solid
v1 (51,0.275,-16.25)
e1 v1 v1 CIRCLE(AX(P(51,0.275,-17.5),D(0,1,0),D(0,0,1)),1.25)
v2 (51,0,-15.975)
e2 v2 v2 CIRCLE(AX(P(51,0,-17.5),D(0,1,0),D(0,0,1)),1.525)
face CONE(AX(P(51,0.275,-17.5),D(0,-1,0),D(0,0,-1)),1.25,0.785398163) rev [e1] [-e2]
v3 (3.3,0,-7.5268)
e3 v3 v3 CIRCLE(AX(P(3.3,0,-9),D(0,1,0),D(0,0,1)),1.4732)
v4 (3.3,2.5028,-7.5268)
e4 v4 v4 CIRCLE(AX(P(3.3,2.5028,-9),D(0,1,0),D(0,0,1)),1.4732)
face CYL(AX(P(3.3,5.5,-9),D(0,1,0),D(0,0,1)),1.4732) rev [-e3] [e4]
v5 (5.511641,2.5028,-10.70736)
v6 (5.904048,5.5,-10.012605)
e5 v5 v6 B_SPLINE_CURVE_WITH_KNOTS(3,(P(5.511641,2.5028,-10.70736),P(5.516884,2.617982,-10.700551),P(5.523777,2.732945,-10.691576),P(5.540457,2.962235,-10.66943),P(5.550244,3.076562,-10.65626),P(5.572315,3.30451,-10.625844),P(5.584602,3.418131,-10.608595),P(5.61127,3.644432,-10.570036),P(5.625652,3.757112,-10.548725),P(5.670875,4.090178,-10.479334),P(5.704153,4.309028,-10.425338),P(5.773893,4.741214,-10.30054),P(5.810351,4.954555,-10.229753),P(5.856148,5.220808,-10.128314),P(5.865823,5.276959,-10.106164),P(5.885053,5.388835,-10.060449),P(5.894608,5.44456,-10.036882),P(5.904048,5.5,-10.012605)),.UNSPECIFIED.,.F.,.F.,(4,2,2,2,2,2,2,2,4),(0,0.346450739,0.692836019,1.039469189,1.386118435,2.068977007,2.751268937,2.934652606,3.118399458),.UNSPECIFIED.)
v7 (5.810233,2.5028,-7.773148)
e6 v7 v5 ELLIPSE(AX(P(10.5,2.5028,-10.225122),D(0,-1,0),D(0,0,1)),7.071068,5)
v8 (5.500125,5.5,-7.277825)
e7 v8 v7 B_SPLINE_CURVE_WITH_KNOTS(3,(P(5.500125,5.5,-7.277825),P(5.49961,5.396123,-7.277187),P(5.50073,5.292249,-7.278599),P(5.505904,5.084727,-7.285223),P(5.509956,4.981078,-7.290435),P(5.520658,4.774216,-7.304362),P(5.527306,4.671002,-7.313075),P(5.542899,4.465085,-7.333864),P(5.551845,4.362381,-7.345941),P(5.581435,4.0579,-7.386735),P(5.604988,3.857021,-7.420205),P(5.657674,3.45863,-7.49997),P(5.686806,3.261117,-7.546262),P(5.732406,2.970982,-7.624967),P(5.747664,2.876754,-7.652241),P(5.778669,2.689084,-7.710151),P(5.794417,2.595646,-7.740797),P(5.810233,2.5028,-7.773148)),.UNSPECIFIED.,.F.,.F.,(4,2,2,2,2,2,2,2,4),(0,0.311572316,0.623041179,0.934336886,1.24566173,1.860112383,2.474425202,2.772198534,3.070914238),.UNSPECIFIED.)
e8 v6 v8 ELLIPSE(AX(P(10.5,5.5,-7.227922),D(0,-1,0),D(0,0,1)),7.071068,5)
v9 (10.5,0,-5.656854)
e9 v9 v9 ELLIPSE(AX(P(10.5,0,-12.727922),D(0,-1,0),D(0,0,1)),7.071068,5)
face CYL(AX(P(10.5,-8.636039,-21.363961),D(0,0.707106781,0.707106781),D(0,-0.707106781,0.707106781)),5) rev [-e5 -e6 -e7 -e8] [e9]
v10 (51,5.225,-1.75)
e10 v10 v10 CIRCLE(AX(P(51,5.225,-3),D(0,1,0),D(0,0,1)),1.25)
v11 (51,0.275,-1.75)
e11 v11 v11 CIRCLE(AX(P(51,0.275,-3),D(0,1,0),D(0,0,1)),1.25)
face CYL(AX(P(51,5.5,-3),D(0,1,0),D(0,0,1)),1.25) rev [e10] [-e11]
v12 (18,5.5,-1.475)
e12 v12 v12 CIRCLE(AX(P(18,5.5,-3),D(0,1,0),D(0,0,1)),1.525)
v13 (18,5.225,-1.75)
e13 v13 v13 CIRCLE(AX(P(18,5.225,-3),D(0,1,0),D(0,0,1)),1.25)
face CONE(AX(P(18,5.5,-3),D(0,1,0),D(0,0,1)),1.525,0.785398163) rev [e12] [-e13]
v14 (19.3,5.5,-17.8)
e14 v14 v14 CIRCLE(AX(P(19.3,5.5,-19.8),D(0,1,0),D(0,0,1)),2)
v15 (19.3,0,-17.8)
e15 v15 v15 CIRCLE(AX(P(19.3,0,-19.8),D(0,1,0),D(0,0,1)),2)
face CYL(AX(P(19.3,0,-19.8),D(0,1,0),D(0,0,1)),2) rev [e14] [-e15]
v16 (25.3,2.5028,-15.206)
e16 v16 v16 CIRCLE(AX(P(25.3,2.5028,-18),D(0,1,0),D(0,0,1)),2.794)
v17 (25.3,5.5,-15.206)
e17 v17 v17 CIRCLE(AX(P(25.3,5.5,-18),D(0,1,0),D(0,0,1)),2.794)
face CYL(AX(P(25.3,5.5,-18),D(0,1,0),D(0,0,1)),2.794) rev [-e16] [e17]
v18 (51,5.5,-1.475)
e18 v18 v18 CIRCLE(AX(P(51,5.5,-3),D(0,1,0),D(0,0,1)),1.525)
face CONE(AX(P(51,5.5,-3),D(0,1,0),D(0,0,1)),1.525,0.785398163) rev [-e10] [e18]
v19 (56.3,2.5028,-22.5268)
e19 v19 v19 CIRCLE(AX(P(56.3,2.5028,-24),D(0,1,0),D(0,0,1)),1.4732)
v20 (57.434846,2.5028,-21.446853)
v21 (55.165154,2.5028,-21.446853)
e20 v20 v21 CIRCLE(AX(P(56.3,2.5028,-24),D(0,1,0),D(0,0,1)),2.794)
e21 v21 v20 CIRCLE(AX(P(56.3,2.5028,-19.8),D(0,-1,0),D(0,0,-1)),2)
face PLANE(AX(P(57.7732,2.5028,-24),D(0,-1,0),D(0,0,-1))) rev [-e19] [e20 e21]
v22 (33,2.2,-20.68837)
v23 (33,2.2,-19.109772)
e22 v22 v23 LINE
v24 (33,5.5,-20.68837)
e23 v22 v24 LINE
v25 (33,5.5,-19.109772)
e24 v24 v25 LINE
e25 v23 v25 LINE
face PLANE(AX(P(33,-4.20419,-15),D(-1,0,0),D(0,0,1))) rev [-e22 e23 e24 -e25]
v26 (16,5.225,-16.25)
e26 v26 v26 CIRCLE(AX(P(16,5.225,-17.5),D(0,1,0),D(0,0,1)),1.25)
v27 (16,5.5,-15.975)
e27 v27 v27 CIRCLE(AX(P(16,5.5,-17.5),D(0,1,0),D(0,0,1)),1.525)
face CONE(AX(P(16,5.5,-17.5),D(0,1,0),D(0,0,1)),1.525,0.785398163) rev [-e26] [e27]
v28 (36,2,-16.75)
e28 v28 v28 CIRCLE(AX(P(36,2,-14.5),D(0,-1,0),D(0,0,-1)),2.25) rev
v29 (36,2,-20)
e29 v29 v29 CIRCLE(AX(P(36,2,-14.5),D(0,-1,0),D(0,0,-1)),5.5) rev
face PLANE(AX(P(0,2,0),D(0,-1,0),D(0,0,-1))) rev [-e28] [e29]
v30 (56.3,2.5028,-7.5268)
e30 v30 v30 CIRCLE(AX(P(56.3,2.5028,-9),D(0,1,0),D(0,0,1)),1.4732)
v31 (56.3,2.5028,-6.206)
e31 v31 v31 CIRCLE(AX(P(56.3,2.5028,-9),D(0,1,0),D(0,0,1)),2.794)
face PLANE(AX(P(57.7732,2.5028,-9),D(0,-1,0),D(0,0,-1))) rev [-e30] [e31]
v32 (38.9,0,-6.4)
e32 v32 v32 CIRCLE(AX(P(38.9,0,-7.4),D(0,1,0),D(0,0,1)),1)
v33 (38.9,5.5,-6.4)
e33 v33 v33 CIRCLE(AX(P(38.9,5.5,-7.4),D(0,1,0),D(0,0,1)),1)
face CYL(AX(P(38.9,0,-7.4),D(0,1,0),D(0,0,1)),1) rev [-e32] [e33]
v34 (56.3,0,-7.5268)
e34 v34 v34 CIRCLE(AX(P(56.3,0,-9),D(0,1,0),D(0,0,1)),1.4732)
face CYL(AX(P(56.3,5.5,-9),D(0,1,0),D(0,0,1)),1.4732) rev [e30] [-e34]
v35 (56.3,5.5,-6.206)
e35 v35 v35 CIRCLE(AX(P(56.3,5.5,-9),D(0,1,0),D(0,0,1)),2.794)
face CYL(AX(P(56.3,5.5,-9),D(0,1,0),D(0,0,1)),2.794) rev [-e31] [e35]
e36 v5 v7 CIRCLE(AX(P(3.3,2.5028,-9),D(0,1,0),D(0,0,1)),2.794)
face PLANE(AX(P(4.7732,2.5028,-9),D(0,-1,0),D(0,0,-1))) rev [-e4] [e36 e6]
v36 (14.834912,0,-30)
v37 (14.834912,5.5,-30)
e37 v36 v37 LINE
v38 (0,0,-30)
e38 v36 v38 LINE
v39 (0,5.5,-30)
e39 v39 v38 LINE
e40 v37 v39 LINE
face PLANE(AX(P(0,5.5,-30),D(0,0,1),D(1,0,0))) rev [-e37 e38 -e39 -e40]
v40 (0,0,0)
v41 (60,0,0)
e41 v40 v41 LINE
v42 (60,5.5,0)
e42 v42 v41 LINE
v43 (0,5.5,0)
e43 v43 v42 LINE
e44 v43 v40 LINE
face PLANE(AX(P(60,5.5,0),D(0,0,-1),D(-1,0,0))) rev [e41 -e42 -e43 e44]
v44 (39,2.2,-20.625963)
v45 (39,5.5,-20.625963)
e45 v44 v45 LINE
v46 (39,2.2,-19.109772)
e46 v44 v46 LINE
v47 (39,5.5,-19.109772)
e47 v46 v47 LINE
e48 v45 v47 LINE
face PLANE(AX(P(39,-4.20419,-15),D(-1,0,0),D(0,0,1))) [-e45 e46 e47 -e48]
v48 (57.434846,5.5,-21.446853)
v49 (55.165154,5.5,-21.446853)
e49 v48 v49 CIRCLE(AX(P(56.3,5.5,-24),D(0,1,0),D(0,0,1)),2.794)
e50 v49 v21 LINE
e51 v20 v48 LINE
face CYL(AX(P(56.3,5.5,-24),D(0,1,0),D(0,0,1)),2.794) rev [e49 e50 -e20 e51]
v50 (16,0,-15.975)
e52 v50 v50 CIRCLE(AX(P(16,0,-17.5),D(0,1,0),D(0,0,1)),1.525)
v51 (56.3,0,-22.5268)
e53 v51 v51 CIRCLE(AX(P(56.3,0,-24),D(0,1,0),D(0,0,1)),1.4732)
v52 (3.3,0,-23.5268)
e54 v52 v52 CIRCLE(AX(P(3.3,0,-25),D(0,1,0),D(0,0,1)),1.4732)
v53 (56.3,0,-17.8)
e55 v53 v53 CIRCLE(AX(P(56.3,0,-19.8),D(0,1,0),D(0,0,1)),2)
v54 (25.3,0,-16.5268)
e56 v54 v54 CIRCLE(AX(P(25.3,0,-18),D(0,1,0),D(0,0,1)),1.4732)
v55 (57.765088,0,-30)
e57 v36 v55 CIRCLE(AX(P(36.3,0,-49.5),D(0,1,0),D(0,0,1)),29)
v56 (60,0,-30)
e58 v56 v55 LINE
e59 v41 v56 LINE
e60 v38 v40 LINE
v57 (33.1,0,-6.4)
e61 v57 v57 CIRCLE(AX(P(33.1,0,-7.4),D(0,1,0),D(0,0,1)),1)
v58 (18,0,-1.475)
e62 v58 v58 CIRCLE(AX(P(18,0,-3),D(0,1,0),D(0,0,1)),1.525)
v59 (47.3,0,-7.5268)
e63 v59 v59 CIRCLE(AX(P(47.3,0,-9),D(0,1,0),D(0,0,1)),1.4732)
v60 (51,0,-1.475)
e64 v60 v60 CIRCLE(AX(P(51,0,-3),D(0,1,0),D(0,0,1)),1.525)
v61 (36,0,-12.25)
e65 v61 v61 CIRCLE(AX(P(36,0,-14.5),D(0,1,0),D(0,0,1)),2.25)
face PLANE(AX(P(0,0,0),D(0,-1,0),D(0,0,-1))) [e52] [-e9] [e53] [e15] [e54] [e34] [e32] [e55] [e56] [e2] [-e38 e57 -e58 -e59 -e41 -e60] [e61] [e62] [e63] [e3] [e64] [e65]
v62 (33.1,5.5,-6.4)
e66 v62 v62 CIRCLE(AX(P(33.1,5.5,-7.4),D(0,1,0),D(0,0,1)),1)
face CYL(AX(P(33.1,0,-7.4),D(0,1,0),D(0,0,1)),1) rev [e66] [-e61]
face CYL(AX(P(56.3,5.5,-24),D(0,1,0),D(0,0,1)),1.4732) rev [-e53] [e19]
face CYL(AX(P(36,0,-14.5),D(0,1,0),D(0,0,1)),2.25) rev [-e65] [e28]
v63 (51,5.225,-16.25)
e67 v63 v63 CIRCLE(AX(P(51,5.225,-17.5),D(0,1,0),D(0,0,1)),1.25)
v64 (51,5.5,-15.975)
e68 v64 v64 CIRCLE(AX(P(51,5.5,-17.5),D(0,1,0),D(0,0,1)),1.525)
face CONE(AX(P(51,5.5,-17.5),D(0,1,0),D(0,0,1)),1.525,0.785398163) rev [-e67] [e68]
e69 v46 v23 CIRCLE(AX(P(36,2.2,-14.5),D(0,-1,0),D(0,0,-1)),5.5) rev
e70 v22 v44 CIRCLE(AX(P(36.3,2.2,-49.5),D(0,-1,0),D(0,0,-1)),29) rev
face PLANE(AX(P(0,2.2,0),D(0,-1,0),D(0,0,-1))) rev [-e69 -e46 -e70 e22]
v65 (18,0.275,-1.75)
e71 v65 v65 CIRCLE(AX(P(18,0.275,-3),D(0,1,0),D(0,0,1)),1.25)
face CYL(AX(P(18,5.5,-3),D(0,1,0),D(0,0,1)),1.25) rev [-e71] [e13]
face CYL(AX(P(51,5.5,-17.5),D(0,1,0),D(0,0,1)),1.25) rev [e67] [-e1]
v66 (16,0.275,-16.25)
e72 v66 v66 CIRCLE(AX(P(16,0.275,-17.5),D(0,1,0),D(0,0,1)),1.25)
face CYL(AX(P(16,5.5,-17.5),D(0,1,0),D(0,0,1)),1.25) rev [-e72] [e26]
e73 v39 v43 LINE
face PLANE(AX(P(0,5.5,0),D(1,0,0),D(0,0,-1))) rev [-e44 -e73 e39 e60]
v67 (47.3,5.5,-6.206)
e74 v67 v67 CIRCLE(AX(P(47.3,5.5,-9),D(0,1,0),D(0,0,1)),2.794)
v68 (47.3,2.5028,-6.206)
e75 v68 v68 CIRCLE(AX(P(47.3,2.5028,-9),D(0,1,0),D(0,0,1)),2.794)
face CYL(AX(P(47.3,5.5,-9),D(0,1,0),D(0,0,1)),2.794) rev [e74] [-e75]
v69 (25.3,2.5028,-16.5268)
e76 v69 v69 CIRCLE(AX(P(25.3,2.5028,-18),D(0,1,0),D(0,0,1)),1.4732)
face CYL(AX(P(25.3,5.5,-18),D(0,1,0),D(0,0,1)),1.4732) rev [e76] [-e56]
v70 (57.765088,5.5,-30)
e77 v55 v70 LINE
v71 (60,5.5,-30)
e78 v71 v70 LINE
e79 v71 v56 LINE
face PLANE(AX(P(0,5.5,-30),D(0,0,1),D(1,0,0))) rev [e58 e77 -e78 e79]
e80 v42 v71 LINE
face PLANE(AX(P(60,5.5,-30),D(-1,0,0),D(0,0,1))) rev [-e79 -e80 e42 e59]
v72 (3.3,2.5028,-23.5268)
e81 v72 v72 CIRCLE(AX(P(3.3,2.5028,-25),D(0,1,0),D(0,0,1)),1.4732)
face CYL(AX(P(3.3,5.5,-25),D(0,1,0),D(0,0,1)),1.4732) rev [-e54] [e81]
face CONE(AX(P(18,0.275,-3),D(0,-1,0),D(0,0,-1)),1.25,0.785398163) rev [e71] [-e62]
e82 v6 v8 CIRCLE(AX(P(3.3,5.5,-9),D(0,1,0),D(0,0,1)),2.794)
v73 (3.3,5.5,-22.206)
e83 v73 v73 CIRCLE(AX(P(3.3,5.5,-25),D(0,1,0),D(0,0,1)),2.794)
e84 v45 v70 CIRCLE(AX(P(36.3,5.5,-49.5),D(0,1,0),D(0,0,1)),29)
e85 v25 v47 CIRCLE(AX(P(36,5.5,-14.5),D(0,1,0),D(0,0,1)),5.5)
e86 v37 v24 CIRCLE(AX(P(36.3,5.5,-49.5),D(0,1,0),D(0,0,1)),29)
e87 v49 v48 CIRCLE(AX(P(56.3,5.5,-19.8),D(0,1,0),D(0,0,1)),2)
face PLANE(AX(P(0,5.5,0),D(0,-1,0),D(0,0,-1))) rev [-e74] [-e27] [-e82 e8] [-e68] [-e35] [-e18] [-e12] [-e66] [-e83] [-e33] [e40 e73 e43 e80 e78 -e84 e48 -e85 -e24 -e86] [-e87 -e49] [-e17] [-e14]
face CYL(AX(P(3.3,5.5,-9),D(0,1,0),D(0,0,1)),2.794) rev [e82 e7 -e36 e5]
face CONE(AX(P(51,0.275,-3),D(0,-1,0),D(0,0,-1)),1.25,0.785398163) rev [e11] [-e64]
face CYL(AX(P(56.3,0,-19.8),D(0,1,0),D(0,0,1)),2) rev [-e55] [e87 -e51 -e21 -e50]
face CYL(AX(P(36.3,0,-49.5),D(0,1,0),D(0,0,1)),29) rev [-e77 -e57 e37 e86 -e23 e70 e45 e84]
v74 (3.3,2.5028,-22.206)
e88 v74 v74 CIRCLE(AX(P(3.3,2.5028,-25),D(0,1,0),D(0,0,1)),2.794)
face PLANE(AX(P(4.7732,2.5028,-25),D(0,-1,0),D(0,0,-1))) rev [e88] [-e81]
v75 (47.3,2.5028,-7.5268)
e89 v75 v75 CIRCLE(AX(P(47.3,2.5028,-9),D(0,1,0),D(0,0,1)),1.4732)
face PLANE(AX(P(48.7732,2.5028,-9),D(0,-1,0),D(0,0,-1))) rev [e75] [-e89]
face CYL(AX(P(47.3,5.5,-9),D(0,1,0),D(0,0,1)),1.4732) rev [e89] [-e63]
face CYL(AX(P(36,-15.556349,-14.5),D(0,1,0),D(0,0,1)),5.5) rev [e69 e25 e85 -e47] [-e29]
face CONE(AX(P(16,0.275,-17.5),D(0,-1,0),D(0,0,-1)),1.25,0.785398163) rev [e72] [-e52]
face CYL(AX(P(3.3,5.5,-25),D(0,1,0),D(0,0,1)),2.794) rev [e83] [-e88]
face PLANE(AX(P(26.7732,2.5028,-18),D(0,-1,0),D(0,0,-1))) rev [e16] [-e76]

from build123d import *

# Parameters (mm, degrees)
SKETCH_1_W                 = 60
SKETCH_1_H                 = 30
EXTRUDE_1_DEPTH            = 5.5
HOLE_WIZARD_41_D           = 2.9464
HOLE_WIZARD_41_CBORE_D     = 5.588
HOLE_WIZARD_41_CBORE_DEPTH = 2.9972
CUT_EXTRUDE_START          = -5.5
CUT_EXTRUDE_1_OUTLINE_R    = 2.25
CUT_EXTRUDE_1_OUTLINE_R_2  = 2
CUT_EXTRUDE_1_OUTLINE_R_3  = 1
CUT_EXTRUDE_1_DEPTH        = 5.5
CUT_EXTRUDE_START_2        = -3.5
SKETCH_4_3_R               = 5.5
SKETCH_4_3_R_2             = 2.25
CUT_EXTRUDE_2_DEPTH        = 3.5
CUT_EXTRUDE_START_3        = -3.3
CUT_EXTRUDE_3_DEPTH        = 3.3
HOLE_WIZARD_M3_AT_2_COUNT  = 2
HOLE_WIZARD_M3_AT_2_PITCH  = 14.637281168
HOLE_WIZARD_M3_AT_3_COUNT  = 2
HOLE_WIZARD_M3_AT_3_PITCH  = 36.045110625
HOLE_WIZARD_M3_AT_4_COUNT  = 2
HOLE_WIZARD_M3_AT_4_PITCH  = 33
SKETCH_7_R                 = 5
CUT_EXTRUDE_4_DEPTH        = 69.411439102


# Read off the part's stored shape, not the designer's step: the extrude step
with BuildPart() as part:
    # Sketch 1 → Extrude 1 (new body)
    with BuildSketch(Plane(origin=(0, 0, 0), x_dir=(1, 0, 0), z_dir=(0, 1, 0))):
        with Locations((30, 15)):
            Rectangle(SKETCH_1_W, SKETCH_1_H)
    extrude(amount=EXTRUDE_1_DEPTH)

    # Hole Wizard 41 (through all)
    with Locations(Plane(origin=(0, 5.5, 0), x_dir=(-1, 0, 0), z_dir=(0, 1, 0))):
        with Locations((-47.3, -9), (-3.3, -9), (-25.3, -18), (-3.3, -25), (-56.3, -9), (-56.3, -24)):
            CounterBoreHole(HOLE_WIZARD_41_D / 2, HOLE_WIZARD_41_CBORE_D / 2, HOLE_WIZARD_41_CBORE_DEPTH)

    # Cut-Extrude 1 outline → Cut-Extrude 1 (cut)
    with BuildSketch(Plane(origin=(0, 5.5, 0), x_dir=(1, 0, 0), z_dir=(0, 1, 0)).offset(CUT_EXTRUDE_START)):
        with BuildLine():
            Line((57.765087934, 30), (14.834912066, 30))
            ThreePointArc((14.834912066, 30), (36.3, 20.5), (57.765087934, 30))
        make_face()
        with Locations((36, 14.5)):
            Circle(CUT_EXTRUDE_1_OUTLINE_R)
        with Locations((19.3, 19.8)):
            Circle(CUT_EXTRUDE_1_OUTLINE_R_2)
        with Locations((33.1, 7.4)):
            Circle(CUT_EXTRUDE_1_OUTLINE_R_3)
        with Locations((38.9, 7.4)):
            Circle(CUT_EXTRUDE_1_OUTLINE_R_3)
        with Locations((56.3, 19.8)):
            Circle(CUT_EXTRUDE_1_OUTLINE_R_2)
    extrude(amount=CUT_EXTRUDE_1_DEPTH, mode=Mode.SUBTRACT)

    # Sketch 4_3 → Cut-Extrude 2 (cut)
    with BuildSketch(Plane(origin=(0, 5.5, 0), x_dir=(1, 0, 0), z_dir=(0, 1, 0)).offset(CUT_EXTRUDE_START_2)):
        with Locations(Location((36, 14.5, 0), (0, 0, 270))):
            Circle(SKETCH_4_3_R)
        with Locations(Location((36, 14.5, 0), (0, 0, 270))):
            Circle(SKETCH_4_3_R_2, mode=Mode.SUBTRACT)
    extrude(amount=CUT_EXTRUDE_2_DEPTH, mode=Mode.SUBTRACT)

    # Sketch 4_4 → Cut-Extrude 3 (cut)
    with BuildSketch(Plane(origin=(0, 5.5, 0), x_dir=(1, 0, 0), z_dir=(0, 1, 0)).offset(CUT_EXTRUDE_START_3)):
        with BuildLine():
            Line((39, 19.109772229), (39, 20.62596322))
            ThreePointArc((39, 20.62596322), (35.998381592, 20.501568554), (33, 20.688370404))
            Line((33, 20.688370404), (33, 19.109772229))
            ThreePointArc((33, 19.109772229), (36, 20), (39, 19.109772229))
        make_face()
    extrude(amount=CUT_EXTRUDE_3_DEPTH, mode=Mode.SUBTRACT)

    # Sketch 5 → Hole Wizard M3 (revolve, cut)
    with BuildSketch(Plane(origin=(18, 5.5, -3), x_dir=(0, 0, 1), z_dir=(1, 0, 0))):
        Polygon((0, 0), (0, 5.5), (1.525, 5.5), (1.25, 5.225), (1.25, 0.275), (1.525, 0), align=None)
    hole_wizard_m3 = revolve(axis=Axis((18, 11.85, -3), (0, -1, 0)), mode=Mode.SUBTRACT)

    # Hole Wizard M3 at 2: Hole Wizard M3 ×2
    with Locations(*[Vector(-0.1366373971370308, 0, -0.9906211292434749) * (i * HOLE_WIZARD_M3_AT_2_PITCH) for i in range(1, HOLE_WIZARD_M3_AT_2_COUNT)]):
        add(hole_wizard_m3, mode=Mode.SUBTRACT)

    # Hole Wizard M3 at 3: Hole Wizard M3 ×2
    with Locations(*[Vector(0.9155194540230326, 0, -0.40227369949496883) * (i * HOLE_WIZARD_M3_AT_3_PITCH) for i in range(1, HOLE_WIZARD_M3_AT_3_COUNT)]):
        add(hole_wizard_m3, mode=Mode.SUBTRACT)

    # Hole Wizard M3 at 4: Hole Wizard M3 ×2
    with Locations(*[(i * HOLE_WIZARD_M3_AT_4_PITCH, 0, 0) for i in range(1, HOLE_WIZARD_M3_AT_4_COUNT)]):
        add(hole_wizard_m3, mode=Mode.SUBTRACT)

    # Sketch 7 → Cut-Extrude 4 (cut, through all)
    with BuildSketch(Plane(origin=(0, 2.75, 2.75), x_dir=(-1, 0, 0), z_dir=(0, 0.7071067811865462, 0.7071067811865488))):
        with Locations(Location((-10.5, -9, 0), (0, 0, 90))):
            Circle(SKETCH_7_R)
    extrude(amount=-CUT_EXTRUDE_4_DEPTH, mode=Mode.SUBTRACT)


solid = part.part
